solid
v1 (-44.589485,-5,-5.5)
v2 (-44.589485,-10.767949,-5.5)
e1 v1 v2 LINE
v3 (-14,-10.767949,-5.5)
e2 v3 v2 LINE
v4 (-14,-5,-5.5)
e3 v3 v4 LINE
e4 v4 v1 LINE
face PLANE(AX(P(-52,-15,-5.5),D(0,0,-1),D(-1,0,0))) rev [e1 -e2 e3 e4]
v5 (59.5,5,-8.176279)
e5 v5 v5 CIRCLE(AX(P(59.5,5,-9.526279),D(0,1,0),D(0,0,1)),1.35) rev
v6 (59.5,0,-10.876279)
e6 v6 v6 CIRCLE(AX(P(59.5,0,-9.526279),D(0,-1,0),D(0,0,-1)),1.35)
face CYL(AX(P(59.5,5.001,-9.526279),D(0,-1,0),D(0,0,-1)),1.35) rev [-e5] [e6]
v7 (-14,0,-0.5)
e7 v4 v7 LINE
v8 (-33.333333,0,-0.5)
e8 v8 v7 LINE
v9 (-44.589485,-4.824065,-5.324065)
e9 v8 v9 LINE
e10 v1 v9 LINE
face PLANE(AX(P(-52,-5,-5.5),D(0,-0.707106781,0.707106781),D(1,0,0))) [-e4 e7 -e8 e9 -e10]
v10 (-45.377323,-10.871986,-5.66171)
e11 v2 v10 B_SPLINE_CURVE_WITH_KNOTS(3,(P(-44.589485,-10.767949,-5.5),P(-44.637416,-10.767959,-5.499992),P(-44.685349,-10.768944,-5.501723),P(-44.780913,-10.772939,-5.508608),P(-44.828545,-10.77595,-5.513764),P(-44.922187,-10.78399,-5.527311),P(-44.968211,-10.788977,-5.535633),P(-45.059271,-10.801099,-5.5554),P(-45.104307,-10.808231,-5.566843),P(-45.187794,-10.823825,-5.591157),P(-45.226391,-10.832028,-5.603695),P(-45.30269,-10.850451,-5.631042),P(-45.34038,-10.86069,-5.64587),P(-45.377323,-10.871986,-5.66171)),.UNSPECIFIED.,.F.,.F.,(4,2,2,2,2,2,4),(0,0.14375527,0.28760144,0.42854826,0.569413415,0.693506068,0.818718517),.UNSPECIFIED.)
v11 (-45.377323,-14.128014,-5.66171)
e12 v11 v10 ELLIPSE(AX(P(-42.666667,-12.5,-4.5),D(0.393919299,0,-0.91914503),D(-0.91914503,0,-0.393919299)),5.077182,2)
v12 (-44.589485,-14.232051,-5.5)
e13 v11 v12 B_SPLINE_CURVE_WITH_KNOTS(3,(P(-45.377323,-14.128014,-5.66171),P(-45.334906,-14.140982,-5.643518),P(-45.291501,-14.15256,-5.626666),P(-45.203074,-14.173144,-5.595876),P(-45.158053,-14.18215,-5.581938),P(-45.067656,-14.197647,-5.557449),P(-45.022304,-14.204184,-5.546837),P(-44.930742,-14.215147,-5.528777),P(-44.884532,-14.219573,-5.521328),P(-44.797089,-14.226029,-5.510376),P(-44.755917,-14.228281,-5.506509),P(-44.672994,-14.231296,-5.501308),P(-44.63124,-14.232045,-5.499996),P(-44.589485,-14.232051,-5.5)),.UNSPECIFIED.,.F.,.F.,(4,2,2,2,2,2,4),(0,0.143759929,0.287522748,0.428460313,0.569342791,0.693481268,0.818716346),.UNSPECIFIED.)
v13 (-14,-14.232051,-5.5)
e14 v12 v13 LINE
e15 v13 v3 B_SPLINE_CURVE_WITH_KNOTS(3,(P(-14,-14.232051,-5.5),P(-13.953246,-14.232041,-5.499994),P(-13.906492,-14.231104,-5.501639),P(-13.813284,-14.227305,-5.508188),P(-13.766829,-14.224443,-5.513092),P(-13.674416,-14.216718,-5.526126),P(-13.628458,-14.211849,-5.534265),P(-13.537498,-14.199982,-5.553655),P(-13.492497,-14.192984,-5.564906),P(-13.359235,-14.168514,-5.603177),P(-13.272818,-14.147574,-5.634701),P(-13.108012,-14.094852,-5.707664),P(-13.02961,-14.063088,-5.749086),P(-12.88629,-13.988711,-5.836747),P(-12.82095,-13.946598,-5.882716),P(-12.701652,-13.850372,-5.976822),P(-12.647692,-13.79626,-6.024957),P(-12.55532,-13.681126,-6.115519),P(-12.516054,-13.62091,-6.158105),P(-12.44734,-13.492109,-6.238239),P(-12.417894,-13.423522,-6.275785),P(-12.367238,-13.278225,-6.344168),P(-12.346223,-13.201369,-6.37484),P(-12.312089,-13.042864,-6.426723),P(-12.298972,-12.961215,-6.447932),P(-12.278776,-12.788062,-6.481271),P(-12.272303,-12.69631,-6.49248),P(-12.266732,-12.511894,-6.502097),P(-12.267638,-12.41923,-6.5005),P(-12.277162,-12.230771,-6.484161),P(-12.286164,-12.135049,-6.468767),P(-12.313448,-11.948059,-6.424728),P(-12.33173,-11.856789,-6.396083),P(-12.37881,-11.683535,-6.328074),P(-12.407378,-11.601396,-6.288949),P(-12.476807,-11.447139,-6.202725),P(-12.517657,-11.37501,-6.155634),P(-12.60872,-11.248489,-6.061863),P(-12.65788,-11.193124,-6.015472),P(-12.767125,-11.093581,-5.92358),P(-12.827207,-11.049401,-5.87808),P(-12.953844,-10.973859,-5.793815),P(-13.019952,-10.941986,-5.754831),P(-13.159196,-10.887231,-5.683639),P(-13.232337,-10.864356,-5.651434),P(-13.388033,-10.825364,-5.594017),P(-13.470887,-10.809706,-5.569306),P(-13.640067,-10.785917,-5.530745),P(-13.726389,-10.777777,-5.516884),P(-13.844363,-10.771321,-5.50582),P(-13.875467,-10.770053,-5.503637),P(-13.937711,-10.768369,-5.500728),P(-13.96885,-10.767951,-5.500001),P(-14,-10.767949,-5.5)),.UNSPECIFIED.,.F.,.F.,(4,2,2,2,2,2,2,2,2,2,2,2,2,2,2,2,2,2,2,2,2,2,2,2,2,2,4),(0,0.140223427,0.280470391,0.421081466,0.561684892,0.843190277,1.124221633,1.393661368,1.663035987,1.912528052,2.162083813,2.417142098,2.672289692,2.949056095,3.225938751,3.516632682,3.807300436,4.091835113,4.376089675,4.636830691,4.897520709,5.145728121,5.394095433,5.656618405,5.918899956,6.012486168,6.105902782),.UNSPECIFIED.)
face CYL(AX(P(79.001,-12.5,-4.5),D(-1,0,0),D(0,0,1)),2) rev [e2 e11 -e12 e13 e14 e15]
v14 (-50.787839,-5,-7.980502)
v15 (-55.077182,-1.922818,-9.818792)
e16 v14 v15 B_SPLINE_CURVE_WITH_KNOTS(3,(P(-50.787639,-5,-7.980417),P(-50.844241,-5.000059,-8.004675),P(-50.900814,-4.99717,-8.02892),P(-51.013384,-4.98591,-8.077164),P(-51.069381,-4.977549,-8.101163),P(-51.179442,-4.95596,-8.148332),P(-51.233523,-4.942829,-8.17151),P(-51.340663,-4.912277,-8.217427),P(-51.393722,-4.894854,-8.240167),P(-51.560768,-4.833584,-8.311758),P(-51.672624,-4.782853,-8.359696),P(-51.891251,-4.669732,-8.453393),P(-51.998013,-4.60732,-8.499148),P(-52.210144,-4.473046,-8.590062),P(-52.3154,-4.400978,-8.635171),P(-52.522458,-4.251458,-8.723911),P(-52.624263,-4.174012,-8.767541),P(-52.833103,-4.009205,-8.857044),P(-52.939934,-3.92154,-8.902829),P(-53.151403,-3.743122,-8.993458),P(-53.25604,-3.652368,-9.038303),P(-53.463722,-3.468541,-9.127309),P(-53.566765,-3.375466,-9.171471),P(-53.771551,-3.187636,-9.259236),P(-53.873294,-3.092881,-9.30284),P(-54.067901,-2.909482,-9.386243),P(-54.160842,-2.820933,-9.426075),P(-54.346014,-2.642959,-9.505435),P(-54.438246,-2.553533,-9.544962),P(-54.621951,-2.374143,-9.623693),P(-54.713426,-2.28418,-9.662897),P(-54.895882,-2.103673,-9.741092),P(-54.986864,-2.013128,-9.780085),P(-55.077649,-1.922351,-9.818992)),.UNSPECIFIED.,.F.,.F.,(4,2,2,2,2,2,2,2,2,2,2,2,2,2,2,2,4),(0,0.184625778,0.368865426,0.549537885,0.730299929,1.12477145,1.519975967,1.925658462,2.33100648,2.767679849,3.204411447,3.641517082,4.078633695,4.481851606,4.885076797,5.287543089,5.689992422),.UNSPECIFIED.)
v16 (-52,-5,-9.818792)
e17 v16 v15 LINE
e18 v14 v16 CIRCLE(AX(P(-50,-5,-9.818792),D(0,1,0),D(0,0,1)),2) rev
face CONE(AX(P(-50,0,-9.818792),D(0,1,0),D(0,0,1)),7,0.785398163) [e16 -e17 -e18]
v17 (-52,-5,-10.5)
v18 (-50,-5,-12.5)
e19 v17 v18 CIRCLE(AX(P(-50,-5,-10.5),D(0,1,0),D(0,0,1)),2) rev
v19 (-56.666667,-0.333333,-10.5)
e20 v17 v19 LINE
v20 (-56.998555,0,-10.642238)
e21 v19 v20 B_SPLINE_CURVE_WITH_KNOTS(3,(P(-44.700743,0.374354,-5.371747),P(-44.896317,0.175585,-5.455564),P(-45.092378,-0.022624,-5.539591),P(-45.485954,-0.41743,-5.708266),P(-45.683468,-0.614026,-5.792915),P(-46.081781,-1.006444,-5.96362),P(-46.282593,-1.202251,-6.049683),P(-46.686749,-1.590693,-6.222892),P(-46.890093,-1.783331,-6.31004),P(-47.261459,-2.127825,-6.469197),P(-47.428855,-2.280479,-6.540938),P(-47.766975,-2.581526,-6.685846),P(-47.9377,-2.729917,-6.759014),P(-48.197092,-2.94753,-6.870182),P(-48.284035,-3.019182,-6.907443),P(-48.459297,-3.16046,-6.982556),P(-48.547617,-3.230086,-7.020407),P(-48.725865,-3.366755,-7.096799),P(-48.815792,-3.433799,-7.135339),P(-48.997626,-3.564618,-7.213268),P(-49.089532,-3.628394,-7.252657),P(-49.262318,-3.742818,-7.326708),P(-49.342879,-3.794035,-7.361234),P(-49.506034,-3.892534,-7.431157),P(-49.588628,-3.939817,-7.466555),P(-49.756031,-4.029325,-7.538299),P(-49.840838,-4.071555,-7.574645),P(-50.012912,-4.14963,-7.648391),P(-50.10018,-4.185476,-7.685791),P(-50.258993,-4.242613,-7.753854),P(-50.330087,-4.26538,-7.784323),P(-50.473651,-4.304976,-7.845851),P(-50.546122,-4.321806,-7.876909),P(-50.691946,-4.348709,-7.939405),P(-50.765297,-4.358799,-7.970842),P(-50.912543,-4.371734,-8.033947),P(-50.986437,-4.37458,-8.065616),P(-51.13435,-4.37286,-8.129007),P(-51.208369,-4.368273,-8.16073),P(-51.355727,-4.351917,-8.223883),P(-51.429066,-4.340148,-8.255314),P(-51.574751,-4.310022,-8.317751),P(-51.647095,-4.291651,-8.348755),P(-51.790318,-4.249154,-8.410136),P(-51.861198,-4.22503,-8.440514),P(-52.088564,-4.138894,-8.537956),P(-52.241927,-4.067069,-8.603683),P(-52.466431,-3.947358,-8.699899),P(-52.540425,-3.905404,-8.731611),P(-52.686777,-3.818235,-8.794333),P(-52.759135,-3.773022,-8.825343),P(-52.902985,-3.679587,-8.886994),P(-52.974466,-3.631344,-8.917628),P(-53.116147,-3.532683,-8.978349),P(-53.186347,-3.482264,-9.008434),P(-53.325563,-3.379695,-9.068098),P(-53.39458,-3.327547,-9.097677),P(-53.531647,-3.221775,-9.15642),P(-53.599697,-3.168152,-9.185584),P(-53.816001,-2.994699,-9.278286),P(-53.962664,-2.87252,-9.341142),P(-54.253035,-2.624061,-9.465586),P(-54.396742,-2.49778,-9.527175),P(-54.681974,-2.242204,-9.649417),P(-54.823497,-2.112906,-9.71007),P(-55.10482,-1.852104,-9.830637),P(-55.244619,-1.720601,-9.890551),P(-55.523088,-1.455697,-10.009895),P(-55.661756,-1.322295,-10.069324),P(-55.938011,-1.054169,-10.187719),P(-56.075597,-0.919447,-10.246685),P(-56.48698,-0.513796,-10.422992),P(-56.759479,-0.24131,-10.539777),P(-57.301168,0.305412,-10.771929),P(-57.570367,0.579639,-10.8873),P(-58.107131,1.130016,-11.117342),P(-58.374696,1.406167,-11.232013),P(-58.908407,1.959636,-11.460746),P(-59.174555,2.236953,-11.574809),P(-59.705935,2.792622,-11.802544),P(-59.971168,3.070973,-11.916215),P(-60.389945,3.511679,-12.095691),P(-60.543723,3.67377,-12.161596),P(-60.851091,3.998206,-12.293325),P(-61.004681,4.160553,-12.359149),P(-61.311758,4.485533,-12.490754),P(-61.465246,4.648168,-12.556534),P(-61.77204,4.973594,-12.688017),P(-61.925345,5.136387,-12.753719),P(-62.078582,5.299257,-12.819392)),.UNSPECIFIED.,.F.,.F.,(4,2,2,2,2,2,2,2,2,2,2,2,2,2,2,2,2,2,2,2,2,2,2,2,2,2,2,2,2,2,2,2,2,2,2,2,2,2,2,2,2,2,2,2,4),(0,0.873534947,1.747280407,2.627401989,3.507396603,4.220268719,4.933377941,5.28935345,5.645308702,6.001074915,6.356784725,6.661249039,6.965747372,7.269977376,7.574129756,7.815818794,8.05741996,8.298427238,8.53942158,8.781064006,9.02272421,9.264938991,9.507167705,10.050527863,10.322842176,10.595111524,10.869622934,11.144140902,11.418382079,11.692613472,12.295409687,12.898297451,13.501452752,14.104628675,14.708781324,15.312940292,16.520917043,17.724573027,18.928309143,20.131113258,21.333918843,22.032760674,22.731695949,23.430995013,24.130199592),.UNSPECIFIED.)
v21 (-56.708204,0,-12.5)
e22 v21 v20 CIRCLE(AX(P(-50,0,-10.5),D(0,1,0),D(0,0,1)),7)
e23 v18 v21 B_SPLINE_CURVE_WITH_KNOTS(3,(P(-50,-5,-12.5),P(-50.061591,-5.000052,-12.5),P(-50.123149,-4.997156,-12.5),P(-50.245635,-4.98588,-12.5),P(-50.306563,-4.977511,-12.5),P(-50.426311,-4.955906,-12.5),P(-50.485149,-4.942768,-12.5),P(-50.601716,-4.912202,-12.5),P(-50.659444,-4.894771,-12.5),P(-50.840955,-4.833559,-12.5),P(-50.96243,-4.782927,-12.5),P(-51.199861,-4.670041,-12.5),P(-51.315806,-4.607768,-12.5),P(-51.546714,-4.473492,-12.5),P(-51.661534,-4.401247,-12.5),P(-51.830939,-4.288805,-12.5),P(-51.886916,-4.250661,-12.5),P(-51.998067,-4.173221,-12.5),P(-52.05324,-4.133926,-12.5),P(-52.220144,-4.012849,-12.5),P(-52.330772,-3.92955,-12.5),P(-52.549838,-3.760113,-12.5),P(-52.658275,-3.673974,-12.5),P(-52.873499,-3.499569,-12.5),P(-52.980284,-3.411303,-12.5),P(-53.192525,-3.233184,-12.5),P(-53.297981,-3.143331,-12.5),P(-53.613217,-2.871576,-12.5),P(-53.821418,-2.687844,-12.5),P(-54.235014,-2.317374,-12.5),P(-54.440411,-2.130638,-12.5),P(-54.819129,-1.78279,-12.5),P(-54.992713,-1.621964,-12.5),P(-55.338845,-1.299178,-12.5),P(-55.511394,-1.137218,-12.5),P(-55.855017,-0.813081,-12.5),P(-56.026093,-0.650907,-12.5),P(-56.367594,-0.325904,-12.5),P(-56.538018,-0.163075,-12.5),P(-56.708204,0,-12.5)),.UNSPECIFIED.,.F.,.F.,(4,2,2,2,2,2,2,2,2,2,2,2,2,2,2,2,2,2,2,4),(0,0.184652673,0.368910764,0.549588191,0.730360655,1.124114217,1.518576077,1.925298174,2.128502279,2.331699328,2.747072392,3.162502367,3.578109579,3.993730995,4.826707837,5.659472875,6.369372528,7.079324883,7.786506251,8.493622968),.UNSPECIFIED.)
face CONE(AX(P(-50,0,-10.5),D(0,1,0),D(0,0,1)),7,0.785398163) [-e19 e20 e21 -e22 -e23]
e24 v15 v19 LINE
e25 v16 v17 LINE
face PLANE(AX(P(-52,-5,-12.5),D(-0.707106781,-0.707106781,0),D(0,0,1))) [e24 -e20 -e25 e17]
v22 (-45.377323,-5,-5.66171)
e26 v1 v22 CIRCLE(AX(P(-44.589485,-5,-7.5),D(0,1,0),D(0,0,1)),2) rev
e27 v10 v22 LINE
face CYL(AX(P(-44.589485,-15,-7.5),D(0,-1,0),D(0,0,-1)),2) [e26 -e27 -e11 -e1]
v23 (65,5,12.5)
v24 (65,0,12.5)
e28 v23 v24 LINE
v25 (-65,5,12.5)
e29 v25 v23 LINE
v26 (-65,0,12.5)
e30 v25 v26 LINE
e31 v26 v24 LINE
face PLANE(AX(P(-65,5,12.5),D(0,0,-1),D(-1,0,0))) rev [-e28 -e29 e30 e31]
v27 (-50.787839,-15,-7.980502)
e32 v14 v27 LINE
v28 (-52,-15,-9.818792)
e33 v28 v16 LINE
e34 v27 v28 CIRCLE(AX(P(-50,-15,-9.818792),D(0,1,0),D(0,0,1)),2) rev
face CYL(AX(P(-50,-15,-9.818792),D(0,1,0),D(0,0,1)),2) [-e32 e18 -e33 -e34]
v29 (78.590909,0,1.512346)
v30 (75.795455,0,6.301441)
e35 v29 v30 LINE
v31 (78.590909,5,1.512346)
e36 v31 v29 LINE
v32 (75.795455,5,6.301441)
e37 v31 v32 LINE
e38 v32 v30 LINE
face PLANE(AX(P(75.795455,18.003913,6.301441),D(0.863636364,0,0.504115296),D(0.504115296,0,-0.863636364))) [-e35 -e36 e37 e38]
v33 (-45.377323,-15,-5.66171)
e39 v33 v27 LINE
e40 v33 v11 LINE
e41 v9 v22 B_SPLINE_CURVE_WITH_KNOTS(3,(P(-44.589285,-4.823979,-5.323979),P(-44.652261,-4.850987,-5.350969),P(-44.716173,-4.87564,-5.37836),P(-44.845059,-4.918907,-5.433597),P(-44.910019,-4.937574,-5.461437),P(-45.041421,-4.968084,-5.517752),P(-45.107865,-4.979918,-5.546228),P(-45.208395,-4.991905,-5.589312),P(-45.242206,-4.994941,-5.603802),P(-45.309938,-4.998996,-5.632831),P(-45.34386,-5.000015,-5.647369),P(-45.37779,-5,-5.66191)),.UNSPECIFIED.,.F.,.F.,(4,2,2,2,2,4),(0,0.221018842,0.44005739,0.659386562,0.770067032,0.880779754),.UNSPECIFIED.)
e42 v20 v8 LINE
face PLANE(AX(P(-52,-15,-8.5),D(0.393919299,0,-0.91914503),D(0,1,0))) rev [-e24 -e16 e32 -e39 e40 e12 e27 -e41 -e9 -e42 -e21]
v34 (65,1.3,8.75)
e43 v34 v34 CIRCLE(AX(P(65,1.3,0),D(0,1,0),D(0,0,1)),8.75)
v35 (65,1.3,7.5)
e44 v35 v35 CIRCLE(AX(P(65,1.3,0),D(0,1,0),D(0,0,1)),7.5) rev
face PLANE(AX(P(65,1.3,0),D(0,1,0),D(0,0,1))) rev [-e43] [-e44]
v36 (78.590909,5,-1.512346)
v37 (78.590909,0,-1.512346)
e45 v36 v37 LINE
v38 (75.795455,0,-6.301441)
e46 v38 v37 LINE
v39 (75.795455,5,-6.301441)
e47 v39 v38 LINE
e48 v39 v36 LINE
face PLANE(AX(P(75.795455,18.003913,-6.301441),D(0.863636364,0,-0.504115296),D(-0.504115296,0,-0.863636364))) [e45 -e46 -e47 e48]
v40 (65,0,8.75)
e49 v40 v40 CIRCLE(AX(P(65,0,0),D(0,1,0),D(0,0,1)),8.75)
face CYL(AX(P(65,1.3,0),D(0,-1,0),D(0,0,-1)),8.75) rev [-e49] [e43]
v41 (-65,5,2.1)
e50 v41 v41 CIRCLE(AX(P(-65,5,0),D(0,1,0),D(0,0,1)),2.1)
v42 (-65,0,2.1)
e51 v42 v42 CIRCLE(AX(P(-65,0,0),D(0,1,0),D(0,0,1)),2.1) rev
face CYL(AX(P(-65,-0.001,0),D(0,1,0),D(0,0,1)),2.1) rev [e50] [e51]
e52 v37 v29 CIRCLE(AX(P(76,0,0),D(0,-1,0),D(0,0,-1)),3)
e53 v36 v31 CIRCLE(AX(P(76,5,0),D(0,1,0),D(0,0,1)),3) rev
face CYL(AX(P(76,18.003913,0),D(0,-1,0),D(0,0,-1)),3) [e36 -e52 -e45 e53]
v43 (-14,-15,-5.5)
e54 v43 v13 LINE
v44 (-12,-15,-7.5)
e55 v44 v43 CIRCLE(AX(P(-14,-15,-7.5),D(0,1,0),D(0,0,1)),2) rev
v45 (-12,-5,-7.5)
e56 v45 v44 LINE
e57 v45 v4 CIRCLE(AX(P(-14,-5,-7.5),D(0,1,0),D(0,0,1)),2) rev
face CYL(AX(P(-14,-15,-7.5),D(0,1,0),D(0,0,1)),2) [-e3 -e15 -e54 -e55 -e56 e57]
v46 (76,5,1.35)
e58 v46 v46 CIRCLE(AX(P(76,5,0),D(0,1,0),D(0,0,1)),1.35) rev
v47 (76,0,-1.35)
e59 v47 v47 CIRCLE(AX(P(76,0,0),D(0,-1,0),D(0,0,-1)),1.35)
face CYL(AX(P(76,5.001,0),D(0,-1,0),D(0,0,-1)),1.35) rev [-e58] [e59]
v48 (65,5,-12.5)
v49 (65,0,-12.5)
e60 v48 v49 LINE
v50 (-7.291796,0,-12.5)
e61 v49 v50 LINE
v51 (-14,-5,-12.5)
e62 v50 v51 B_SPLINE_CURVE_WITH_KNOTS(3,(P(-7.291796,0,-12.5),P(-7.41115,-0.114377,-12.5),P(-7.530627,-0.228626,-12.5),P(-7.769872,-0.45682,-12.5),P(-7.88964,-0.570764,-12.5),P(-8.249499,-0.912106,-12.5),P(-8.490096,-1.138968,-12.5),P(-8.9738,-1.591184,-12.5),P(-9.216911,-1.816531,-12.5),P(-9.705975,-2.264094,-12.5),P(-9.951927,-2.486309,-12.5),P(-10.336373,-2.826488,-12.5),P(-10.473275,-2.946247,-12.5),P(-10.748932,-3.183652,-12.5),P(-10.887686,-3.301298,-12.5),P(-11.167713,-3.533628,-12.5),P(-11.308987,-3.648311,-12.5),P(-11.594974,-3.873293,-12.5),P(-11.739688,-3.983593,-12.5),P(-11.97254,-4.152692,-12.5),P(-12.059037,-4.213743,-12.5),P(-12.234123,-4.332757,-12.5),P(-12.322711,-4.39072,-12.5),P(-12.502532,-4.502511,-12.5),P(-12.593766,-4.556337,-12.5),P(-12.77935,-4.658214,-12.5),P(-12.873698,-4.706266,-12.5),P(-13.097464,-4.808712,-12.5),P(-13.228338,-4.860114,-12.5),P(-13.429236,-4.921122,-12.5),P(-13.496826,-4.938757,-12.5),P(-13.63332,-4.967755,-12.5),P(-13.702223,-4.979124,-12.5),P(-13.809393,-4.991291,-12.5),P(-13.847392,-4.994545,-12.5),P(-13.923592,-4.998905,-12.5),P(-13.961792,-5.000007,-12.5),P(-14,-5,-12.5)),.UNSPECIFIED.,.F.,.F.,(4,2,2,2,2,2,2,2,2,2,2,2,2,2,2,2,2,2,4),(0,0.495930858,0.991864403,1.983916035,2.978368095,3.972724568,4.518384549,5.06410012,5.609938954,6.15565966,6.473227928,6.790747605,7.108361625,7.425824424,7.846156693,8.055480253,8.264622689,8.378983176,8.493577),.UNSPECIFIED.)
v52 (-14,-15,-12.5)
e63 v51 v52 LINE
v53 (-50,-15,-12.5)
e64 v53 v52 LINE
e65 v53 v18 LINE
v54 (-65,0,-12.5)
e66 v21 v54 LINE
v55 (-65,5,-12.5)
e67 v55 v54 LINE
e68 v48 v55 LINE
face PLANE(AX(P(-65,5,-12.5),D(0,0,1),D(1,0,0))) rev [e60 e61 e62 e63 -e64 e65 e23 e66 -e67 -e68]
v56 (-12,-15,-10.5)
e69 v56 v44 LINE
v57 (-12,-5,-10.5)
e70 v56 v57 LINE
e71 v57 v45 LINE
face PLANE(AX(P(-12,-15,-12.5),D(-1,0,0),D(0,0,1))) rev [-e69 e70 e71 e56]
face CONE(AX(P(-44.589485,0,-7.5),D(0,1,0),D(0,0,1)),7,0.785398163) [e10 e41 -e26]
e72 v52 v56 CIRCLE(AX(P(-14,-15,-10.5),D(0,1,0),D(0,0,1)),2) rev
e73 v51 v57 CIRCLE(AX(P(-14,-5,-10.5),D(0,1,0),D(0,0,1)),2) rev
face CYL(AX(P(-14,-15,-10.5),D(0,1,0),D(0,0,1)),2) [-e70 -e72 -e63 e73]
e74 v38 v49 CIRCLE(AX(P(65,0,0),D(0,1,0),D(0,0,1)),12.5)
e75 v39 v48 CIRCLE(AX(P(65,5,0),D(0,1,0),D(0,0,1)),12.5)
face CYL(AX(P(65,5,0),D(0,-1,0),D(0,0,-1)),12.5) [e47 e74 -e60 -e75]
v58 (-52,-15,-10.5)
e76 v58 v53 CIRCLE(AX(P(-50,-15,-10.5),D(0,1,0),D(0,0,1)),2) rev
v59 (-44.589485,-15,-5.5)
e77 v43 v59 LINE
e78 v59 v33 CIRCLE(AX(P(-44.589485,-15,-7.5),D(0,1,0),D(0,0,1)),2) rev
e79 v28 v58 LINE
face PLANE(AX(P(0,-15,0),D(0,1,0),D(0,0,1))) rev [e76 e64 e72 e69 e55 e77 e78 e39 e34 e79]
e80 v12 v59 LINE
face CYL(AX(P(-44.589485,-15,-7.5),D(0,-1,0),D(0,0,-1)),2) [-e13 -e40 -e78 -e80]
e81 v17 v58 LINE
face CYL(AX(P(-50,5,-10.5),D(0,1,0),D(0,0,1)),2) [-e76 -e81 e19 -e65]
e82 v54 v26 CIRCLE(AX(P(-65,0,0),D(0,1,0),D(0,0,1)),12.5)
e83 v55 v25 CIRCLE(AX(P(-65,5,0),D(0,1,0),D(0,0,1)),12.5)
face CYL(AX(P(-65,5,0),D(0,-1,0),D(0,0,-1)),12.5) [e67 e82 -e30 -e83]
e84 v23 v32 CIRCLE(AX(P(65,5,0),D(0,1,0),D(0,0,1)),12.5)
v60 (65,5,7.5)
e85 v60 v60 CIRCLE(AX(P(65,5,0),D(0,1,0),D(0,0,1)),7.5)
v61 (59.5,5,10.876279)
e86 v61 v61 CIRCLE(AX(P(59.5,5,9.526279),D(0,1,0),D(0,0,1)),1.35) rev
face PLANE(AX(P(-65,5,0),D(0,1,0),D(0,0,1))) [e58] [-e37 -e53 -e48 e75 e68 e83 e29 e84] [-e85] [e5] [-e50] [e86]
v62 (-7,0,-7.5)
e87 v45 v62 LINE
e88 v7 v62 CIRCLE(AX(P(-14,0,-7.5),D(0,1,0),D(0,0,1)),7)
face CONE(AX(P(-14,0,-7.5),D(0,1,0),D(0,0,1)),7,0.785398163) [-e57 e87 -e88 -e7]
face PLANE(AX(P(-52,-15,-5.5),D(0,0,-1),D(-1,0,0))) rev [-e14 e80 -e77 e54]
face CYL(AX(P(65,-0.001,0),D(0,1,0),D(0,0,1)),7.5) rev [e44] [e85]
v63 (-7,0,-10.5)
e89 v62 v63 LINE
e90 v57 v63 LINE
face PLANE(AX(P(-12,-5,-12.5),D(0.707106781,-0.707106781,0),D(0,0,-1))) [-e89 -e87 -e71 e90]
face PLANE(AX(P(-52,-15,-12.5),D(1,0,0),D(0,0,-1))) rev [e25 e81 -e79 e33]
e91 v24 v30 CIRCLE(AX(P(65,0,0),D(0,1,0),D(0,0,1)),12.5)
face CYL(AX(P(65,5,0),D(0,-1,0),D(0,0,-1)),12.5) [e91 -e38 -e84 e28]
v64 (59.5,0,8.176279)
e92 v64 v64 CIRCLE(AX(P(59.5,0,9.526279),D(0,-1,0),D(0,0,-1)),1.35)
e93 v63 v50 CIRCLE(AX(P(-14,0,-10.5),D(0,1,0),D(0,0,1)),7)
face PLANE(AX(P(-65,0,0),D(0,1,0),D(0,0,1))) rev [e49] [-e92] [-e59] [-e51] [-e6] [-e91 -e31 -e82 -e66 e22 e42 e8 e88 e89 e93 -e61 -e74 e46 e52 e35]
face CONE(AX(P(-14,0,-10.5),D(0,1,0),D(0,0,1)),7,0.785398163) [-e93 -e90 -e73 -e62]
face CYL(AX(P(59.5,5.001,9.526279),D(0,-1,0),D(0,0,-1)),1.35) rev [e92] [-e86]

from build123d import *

# Parameters (mm, degrees)
EXTRUDE_1_DEPTH     = 5
EXTRUDE_5_DEPTH     = 5
CUT_EXTRUDE_2_REACH = 82.139
SKETCH_7_R          = 7.5
SKETCH_8_R          = 8.75
CUT_EXTRUDE_3_DEPTH = 1.3
CUT_EXTRUDE_4_REACH = 82.139
SKETCH_9_R          = 1.35
CUT_EXTRUDE_5_REACH = 82.139
SKETCH_12_R         = 2.1
SKETCH_14_W         = 40
SKETCH_14_H         = 7
EXTRUDE_6_DEPTH     = 15
CHAMFER_1_SIZE      = 7
CHAMFER_1_SIZE2     = 3
CUT_EXTRUDE_6_REACH = 134.447
SKETCH_15_R         = 2
FILLET_3_R          = 2
CHAMFER_2_SIZE      = 5
CUT_EXTRUDE_7_DEPTH = 15


with BuildPart() as part:
    # 草图1 → 凸台-拉伸1 (new body)
    with BuildSketch(Plane(origin=(0, 0, 0), x_dir=(1, 0, 0), z_dir=(0, 1, 0))):
        with BuildLine():
            Line((-65, 12.5), (65, 12.5))
            ThreePointArc((65, 12.5), (77.5, 0), (65, -12.5))
            Line((65, -12.5), (-65, -12.5))
            ThreePointArc((-65, -12.5), (-77.5, 0), (-65, 12.5))
        make_face()
    extrude(amount=EXTRUDE_1_DEPTH)

    # 草图10 → 凸台-拉伸5 (add)
    with BuildSketch(Plane.XZ):
        with BuildLine():
            Line((75.795454545, -6.301441197), (78.590909091, -1.512345887))
            ThreePointArc((78.590909091, -1.512345887), (79, 0), (78.590909091, 1.512345887))
            Line((78.590909091, 1.512345887), (75.795454545, 6.301441197))
            Line((75.795454545, 6.301441197), (75.795454545, -6.301441197))
        make_face()
    extrude(amount=-EXTRUDE_5_DEPTH)

    # 草图7 → 切除-拉伸2 (cut, up to next)
    with BuildSketch(Plane(origin=(0, 5, 0), x_dir=(1, 0, 0), z_dir=(0, 1, 0)), mode=Mode.PRIVATE) as cut_extrude_2_sk1:
        with Locations(Location((65, 0, 0), (0, 0, 270))):
            Circle(SKETCH_7_R)
    cut_extrude_2_tool1 = extrude(cut_extrude_2_sk1.sketch, amount=-CUT_EXTRUDE_2_REACH, mode=Mode.PRIVATE) & part.part
    add(cut_extrude_2_tool1.solids().sort_by_distance((65, 5, 0))[0], mode=Mode.SUBTRACT)

    # 草图8 → 切除-拉伸3 (cut)
    with BuildSketch(Plane(origin=(0, 0, 0), x_dir=(1, 0, 0), z_dir=(0, 1, 0))):
        with Locations(Location((65, 0, 0), (0, 0, 270))):
            Circle(SKETCH_8_R)
    extrude(amount=CUT_EXTRUDE_3_DEPTH, mode=Mode.SUBTRACT)

    # 草图9 → 切除-拉伸4 (cut, up to next)
    with BuildSketch(Plane.XZ, mode=Mode.PRIVATE) as cut_extrude_4_sk1:
        with Locations(Location((59.5, 9.526279442, 0), (0, 0, 270))):
            Circle(SKETCH_9_R)
    cut_extrude_4_tool1 = extrude(cut_extrude_4_sk1.sketch, amount=-CUT_EXTRUDE_4_REACH, mode=Mode.PRIVATE) & part.part
    # 草图9 → 切除-拉伸4 (cut, up to next)
    with BuildSketch(Plane.XZ, mode=Mode.PRIVATE) as cut_extrude_4_sk2:
        with Locations(Location((76, 0, 0), (0, 0, 270))):
            Circle(SKETCH_9_R)
    cut_extrude_4_tool2 = extrude(cut_extrude_4_sk2.sketch, amount=-CUT_EXTRUDE_4_REACH, mode=Mode.PRIVATE) & part.part
    # 草图9 → 切除-拉伸4 (cut, up to next)
    with BuildSketch(Plane.XZ, mode=Mode.PRIVATE) as cut_extrude_4_sk3:
        with Locations(Location((59.5, -9.526279442, 0), (0, 0, 270))):
            Circle(SKETCH_9_R)
    cut_extrude_4_tool3 = extrude(cut_extrude_4_sk3.sketch, amount=-CUT_EXTRUDE_4_REACH, mode=Mode.PRIVATE) & part.part
    add(cut_extrude_4_tool1.solids().sort_by_distance((59.5, 0, 9.526279))[0], mode=Mode.SUBTRACT)
    add(cut_extrude_4_tool2.solids().sort_by_distance((76, 0, 0))[0], mode=Mode.SUBTRACT)
    add(cut_extrude_4_tool3.solids().sort_by_distance((59.5, 0, -9.526279))[0], mode=Mode.SUBTRACT)

    # 草图12 → 切除-拉伸5 (cut, up to next)
    with BuildSketch(Plane(origin=(0, 5, 0), x_dir=(1, 0, 0), z_dir=(0, 1, 0)), mode=Mode.PRIVATE) as cut_extrude_5_sk1:
        with Locations(Location((-65, 0, 0), (0, 0, 270))):
            Circle(SKETCH_12_R)
    cut_extrude_5_tool1 = extrude(cut_extrude_5_sk1.sketch, amount=-CUT_EXTRUDE_5_REACH, mode=Mode.PRIVATE) & part.part
    add(cut_extrude_5_tool1.solids().sort_by_distance((-65, 5, 0))[0], mode=Mode.SUBTRACT)

    # 草图14 → 凸台-拉伸6 (add)
    with BuildSketch(Plane.XZ):
        with Locations((-32, -9)):
            Rectangle(SKETCH_14_W, SKETCH_14_H)
    extrude(amount=EXTRUDE_6_DEPTH)

    # 倒角1
    chamfer_1_edges = [part.edges().sort_by_distance(p)[0] for p in [
        (-52, -7.5, -5.5),
    ]]
    chamfer_1_side = [part.faces().sort_by_distance(p)[0] for p in [
        (-32, -7.5, -5.5),
    ]]
    chamfer(chamfer_1_edges, length=CHAMFER_1_SIZE, length2=CHAMFER_1_SIZE2, reference=chamfer_1_side[0])

    # 草图15 → 切除-拉伸6 (cut, up to next)
    with BuildSketch(Plane.ZY.offset(52), mode=Mode.PRIVATE) as cut_extrude_6_sk1:
        with Locations((-4.5, -12.5)):
            Circle(SKETCH_15_R)
    cut_extrude_6_tool1 = extrude(cut_extrude_6_sk1.sketch, amount=-CUT_EXTRUDE_6_REACH, mode=Mode.PRIVATE) & part.part
    add(cut_extrude_6_tool1.solids().sort_by_distance((-52, -12.5, -4.5))[0], mode=Mode.SUBTRACT)

    # 圆角3
    fillet_3_edges = [part.edges().sort_by_distance(p)[0] for p in [
        (-52, -7.5, -8.5),
        (-52, -7.5, -12.5),
        (-45, -14.616025404, -5.5),
        (-45, -5.383974596, -5.5),
        (-12, -5.383974596, -5.5),
        (-12, -7.5, -12.5),
    ]]
    fillet(fillet_3_edges, radius=FILLET_3_R - 0.0001)  # a hair under: the kernel refuses the full size

    # 倒角2
    chamfer_2_edges = [part.edges().sort_by_distance(p)[0] for p in [
        (-52, 0, -10.159413188),
        (-48.082601766, 0, -6.821115043),
        (-29.294702561, 0, -5.5),
        (-12, 0, -9),
        (-51.6696987, 0, -8.717799408),
        (-51.414242852, 0, -11.914242852),
        (-44.99161676, 0, -5.540842512),
        (-12.585757148, 0, -6.085757148),
        (-12.585757148, 0, -11.914242852),
    ]]
    chamfer(chamfer_2_edges, length=CHAMFER_2_SIZE)

    # 草图16 → 切除-拉伸7 (cut)
    with BuildSketch(Plane.XZ.offset(15)):
        Polygon((-61.333333333, -12.5), (-33.333333333, -0.5), (-61.333333333, -0.5), align=None)
    extrude(amount=-CUT_EXTRUDE_7_DEPTH, mode=Mode.SUBTRACT)


solid = part.part
